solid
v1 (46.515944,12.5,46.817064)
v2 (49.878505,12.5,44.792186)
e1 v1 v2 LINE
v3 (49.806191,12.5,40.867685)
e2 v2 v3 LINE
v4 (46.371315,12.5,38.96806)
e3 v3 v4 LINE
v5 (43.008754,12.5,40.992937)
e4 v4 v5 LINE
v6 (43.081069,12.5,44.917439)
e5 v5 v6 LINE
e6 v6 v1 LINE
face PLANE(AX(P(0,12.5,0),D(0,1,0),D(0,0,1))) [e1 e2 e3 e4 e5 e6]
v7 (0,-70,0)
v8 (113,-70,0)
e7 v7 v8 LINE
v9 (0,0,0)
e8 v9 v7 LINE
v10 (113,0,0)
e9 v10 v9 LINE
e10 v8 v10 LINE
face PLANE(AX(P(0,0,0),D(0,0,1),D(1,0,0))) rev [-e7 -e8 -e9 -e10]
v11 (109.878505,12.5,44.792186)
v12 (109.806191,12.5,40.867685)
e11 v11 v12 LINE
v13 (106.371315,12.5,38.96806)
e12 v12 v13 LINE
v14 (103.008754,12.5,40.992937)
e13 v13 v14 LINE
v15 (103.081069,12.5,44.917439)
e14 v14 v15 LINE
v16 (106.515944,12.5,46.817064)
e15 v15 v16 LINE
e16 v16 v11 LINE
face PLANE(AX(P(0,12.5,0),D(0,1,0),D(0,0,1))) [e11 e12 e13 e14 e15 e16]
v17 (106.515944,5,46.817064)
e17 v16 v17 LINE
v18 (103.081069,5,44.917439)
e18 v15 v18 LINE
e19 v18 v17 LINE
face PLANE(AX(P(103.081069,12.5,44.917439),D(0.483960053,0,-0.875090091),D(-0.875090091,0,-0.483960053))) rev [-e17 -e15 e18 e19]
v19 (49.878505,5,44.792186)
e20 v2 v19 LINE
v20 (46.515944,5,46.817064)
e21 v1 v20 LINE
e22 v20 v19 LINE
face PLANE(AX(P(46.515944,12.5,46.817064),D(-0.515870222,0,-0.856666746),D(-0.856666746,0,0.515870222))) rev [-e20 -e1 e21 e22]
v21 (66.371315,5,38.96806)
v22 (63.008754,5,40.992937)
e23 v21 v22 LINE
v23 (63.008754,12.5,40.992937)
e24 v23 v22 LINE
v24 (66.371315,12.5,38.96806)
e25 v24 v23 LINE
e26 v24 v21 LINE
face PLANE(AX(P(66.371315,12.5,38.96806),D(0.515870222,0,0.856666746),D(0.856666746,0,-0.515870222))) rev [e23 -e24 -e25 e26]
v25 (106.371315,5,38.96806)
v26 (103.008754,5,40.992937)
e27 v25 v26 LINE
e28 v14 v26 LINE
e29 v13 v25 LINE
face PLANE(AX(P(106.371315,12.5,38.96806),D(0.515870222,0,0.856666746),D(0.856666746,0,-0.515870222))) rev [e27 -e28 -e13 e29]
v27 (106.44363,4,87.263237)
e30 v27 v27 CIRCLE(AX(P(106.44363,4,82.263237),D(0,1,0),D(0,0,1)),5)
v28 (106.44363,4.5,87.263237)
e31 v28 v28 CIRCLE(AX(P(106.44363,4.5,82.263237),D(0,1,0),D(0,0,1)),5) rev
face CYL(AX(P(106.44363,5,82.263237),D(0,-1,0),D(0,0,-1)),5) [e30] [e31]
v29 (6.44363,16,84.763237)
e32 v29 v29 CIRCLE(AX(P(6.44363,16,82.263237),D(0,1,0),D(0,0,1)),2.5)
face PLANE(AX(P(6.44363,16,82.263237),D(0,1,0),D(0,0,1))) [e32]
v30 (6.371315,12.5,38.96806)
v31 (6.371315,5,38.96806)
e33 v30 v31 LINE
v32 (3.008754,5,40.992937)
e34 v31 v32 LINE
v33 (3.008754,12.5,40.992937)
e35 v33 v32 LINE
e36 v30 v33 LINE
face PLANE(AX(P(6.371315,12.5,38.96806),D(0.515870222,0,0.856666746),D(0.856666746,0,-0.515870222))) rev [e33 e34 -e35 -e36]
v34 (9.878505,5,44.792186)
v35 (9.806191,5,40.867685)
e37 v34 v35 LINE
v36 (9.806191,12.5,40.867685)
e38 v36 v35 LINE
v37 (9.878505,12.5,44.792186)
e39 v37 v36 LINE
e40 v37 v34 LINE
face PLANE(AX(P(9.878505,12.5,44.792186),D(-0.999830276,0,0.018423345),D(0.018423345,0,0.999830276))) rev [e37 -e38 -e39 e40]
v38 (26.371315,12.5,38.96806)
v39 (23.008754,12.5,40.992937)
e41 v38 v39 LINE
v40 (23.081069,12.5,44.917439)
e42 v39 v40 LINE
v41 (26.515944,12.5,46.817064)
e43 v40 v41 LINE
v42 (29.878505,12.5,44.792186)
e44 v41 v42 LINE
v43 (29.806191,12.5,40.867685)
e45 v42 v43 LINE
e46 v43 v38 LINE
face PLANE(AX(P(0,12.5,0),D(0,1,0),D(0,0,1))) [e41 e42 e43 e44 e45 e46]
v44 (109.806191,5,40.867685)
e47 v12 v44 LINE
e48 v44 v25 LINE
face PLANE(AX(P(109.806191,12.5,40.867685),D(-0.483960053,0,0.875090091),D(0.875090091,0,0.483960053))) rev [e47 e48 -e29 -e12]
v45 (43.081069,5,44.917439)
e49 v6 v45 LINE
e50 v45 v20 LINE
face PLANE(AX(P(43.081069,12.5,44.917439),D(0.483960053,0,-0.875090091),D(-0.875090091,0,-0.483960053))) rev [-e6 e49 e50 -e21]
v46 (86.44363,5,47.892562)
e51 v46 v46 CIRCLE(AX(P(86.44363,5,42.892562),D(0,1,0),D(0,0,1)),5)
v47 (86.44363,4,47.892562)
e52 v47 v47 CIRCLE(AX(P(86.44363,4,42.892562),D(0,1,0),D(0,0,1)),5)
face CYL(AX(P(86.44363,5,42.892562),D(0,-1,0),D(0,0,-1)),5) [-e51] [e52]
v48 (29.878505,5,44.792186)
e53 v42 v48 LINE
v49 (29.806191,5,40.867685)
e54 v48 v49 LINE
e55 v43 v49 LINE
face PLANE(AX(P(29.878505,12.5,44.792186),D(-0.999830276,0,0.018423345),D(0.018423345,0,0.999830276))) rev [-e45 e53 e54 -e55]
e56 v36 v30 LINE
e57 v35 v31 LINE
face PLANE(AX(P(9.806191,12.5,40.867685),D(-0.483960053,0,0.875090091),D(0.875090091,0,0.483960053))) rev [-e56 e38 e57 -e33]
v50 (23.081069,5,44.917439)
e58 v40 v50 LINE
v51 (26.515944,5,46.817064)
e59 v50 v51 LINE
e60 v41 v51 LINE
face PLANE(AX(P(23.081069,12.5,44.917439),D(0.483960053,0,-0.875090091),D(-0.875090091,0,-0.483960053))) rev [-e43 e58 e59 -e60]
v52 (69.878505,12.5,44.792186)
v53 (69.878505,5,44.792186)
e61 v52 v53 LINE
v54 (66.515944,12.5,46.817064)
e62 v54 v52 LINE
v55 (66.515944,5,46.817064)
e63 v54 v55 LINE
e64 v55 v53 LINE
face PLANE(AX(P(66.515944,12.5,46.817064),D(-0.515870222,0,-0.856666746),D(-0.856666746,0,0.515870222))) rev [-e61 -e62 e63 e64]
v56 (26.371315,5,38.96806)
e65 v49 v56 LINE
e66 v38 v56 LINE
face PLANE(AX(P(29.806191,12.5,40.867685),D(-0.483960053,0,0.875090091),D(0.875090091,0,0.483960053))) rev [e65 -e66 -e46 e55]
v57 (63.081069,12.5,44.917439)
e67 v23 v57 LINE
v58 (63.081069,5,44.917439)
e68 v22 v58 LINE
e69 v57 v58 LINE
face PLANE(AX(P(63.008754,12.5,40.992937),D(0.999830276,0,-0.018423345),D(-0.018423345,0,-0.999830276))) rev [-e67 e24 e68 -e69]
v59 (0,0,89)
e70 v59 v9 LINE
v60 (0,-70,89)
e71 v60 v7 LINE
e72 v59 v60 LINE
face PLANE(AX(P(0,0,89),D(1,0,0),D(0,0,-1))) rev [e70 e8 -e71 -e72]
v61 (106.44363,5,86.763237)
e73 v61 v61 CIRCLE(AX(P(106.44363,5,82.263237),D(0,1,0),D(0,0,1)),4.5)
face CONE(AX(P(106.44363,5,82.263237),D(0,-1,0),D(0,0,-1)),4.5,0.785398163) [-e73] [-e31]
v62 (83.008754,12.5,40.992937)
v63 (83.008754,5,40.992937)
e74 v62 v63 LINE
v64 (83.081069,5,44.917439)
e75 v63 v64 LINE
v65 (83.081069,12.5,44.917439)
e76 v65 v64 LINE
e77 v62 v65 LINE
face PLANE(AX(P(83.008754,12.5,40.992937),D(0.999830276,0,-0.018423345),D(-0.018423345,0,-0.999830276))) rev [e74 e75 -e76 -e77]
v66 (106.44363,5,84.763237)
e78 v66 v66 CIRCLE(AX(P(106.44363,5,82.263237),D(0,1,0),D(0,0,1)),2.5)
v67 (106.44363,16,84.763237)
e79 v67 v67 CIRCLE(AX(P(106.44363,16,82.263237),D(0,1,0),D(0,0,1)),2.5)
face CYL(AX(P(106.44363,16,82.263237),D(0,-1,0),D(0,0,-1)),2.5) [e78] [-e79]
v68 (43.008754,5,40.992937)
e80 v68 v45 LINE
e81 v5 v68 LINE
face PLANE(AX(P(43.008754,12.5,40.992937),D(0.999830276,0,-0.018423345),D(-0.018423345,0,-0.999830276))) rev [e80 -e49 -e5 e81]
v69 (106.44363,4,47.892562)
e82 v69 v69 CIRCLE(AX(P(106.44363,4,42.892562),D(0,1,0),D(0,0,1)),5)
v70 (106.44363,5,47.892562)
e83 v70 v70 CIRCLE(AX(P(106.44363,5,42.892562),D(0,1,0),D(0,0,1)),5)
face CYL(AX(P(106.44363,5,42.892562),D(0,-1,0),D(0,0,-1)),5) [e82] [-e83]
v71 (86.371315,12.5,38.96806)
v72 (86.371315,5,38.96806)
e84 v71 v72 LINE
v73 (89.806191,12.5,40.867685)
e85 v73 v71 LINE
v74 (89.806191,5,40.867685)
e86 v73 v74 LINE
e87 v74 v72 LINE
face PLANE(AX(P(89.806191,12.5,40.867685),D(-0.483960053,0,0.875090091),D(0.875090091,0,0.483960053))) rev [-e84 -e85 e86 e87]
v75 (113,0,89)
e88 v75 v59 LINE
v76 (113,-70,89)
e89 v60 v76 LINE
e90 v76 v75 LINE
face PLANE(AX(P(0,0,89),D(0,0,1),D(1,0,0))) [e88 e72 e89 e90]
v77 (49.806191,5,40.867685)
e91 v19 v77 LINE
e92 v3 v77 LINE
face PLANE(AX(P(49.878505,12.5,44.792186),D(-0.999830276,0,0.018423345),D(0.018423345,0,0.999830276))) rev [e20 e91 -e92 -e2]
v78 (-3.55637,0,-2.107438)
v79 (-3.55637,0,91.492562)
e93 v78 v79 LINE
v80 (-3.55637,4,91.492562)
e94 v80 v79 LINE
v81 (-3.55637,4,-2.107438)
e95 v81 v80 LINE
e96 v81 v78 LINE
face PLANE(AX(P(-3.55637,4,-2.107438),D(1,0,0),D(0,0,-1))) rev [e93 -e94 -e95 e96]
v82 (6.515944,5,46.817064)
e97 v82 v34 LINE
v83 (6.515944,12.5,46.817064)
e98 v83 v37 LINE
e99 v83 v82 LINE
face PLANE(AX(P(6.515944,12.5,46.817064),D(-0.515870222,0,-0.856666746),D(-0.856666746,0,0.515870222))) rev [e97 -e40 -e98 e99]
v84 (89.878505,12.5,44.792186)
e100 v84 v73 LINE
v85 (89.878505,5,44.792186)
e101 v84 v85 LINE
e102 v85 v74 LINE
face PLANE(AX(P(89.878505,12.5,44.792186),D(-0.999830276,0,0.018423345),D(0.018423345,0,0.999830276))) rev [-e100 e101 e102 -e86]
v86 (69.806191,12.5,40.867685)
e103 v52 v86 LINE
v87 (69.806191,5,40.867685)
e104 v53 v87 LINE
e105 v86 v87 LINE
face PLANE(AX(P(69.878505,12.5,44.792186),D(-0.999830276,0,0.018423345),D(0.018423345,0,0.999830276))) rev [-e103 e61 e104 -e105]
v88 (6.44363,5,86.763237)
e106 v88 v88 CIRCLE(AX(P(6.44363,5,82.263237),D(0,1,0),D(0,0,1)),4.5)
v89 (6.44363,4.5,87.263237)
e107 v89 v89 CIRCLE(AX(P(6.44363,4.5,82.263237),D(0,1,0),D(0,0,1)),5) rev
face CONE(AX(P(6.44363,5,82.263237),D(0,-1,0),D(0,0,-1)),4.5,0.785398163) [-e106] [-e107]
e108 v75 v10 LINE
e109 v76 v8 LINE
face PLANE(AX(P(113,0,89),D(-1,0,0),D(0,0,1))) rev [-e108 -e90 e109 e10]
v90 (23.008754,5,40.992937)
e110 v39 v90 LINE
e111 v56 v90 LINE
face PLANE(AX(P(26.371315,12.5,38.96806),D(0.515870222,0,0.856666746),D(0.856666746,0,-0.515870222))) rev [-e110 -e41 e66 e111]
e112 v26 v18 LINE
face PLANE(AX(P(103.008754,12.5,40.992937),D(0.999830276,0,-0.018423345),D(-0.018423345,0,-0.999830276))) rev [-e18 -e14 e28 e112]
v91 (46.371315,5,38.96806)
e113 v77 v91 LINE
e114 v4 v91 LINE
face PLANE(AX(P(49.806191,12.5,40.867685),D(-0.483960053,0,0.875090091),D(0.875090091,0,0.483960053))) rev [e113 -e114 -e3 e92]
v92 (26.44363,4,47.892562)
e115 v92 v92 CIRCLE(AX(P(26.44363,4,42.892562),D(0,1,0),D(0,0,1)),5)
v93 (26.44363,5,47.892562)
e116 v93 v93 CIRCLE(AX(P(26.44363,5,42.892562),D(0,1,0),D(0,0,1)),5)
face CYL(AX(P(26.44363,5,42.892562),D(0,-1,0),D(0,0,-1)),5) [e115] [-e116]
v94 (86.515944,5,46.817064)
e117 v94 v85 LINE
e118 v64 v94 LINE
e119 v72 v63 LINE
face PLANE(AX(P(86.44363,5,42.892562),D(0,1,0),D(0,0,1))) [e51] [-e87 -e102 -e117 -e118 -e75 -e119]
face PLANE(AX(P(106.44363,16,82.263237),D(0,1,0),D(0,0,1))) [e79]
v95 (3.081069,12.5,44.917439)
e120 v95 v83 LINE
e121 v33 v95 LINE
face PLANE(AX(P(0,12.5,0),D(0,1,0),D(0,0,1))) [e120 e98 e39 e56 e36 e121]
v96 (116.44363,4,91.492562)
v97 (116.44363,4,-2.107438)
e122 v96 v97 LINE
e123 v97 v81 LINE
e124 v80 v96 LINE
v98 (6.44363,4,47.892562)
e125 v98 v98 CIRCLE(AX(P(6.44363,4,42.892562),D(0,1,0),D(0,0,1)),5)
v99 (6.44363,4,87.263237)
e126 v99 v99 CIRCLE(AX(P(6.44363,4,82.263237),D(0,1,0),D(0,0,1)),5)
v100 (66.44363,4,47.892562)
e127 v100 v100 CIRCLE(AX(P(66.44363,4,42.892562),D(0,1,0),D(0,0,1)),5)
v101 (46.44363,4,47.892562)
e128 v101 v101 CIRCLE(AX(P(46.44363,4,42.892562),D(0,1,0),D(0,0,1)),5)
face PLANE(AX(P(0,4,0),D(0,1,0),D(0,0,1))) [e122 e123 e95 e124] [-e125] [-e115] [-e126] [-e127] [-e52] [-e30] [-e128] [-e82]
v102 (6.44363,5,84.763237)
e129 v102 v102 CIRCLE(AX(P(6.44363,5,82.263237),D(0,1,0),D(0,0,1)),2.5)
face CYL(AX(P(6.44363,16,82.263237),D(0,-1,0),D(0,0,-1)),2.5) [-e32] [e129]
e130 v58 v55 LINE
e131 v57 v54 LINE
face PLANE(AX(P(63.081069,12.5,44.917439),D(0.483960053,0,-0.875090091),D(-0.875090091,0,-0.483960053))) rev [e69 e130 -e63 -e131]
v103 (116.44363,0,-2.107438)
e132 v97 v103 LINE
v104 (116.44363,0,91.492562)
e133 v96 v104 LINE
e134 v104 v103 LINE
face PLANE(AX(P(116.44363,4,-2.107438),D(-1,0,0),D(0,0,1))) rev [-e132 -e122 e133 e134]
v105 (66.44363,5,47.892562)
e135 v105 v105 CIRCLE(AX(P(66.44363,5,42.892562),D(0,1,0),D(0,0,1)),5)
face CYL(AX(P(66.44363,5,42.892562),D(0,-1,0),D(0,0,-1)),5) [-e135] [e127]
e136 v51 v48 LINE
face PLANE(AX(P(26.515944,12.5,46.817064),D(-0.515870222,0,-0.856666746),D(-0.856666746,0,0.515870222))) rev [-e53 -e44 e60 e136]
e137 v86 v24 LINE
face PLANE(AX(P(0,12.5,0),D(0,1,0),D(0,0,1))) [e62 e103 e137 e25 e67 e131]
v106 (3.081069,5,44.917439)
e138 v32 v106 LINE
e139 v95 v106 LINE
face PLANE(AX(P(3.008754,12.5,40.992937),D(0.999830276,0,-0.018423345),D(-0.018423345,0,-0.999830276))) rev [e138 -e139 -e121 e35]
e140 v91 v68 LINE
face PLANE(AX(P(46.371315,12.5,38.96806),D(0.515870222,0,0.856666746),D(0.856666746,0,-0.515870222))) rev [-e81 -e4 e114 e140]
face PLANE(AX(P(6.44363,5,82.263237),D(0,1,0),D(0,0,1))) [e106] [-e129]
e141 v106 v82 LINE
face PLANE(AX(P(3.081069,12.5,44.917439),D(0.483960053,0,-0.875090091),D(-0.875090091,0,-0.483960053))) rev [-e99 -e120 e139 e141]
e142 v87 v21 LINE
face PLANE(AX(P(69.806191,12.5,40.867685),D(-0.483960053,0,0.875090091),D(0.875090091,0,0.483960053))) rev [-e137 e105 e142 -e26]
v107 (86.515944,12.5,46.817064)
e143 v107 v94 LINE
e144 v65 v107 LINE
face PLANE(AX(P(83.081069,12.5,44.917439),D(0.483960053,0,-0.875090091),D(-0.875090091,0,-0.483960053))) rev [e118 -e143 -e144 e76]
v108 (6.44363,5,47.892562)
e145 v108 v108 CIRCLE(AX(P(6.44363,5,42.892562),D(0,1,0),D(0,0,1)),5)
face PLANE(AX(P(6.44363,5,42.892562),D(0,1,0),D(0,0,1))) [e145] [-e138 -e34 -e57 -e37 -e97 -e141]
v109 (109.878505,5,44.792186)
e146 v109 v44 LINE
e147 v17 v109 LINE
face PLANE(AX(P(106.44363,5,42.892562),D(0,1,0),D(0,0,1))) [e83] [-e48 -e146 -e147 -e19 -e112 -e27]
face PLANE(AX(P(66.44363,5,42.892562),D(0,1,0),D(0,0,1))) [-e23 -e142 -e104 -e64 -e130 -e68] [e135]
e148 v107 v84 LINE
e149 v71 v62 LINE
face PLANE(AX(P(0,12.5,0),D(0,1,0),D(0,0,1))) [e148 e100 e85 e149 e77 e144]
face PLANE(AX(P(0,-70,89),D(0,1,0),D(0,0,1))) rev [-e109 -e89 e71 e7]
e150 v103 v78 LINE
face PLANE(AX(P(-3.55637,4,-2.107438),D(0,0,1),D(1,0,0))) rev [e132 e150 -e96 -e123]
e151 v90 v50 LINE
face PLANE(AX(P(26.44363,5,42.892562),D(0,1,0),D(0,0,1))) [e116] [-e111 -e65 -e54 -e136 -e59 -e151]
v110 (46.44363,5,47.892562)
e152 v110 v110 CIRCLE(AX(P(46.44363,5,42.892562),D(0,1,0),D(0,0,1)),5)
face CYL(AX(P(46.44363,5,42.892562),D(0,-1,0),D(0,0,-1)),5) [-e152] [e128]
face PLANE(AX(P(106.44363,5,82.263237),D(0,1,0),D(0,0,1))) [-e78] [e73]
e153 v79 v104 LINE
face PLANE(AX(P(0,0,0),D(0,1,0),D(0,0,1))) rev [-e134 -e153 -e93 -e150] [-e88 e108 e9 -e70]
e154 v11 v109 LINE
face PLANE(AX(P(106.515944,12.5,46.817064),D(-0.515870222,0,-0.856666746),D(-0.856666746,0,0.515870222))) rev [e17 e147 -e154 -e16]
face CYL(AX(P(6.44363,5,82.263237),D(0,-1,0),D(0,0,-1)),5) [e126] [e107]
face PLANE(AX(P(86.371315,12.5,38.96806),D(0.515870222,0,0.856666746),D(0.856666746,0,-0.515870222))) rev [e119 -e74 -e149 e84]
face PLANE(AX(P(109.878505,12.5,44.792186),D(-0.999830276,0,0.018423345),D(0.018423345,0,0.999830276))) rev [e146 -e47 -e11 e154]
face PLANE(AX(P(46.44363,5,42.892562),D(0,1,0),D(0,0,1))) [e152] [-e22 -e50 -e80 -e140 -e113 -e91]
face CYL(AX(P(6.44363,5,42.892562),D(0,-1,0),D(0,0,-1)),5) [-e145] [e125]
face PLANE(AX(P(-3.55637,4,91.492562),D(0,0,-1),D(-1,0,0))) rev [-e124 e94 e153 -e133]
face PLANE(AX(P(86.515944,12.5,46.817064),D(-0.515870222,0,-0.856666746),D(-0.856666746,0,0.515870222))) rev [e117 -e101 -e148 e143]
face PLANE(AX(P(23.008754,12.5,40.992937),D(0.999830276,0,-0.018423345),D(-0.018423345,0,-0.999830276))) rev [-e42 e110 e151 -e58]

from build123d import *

# Parameters (mm, degrees)
SKETCH2_W           = 113
SKETCH2_H           = 70
BOSS_EXTRUDE2_DEPTH = 89
SKETCH3_W           = 120
SKETCH3_H           = 93.6
BOSS_EXTRUDE3_DEPTH = 4
SKETCH5_R           = 5
BOSS_EXTRUDE4_DEPTH = 1
BOSS_EXTRUDE5_DEPTH = 7.5
SKETCH9_R           = 5
BOSS_EXTRUDE6_DEPTH = 1
SKETCH11_R          = 2.5
BOSS_EXTRUDE7_DEPTH = 11


with BuildPart() as part:
    # Sketch2 → Boss-Extrude2 (new body)
    with BuildSketch(Plane.XY):
        with Locations((56.5, -35)):
            Rectangle(SKETCH2_W, SKETCH2_H)
    extrude(amount=BOSS_EXTRUDE2_DEPTH)

    # Sketch3 → Boss-Extrude3 (add)
    with BuildSketch(Plane(origin=(0, 0, 0), x_dir=(1, 0, 0), z_dir=(0, 1, 0))):
        with Locations((56.443629761, -44.692561868)):
            Rectangle(SKETCH3_W, SKETCH3_H)
    extrude(amount=BOSS_EXTRUDE3_DEPTH)

    # Sketch5 → Boss-Extrude4 (add)
    with BuildSketch(Plane(origin=(0, 4, 0), x_dir=(1, 0, 0), z_dir=(0, 1, 0))):
        with Locations(Location((6.443629761, -42.892561868, 0), (0, 0, 270))):
            Circle(SKETCH5_R)
        with Locations(Location((26.443629761, -42.892561868, 0), (0, 0, 270))):
            Circle(SKETCH5_R)
        with Locations(Location((46.443629761, -42.892561868, 0), (0, 0, 270))):
            Circle(SKETCH5_R)
        with Locations(Location((66.443629761, -42.892561868, 0), (0, 0, 270))):
            Circle(SKETCH5_R)
        with Locations(Location((86.443629761, -42.892561868, 0), (0, 0, 270))):
            Circle(SKETCH5_R)
        with Locations(Location((106.443629761, -42.892561868, 0), (0, 0, 270))):
            Circle(SKETCH5_R)
    extrude(amount=BOSS_EXTRUDE4_DEPTH)

    # Sketch7 → Boss-Extrude5 (add)
    with BuildSketch(Plane(origin=(0, 5, 0), x_dir=(1, 0, 0), z_dir=(0, 1, 0))):
        Polygon((29.878505301, -44.792186338), (29.80619058, -40.867684626), (26.37131504, -38.968060156), (23.008754221, -40.992937397), (23.081068941, -44.917439109), (26.515944482, -46.81706358), align=None)
        Polygon((9.878505301, -44.792186338), (9.80619058, -40.867684626), (6.37131504, -38.968060156), (3.008754221, -40.992937397), (3.081068941, -44.917439109), (6.515944482, -46.81706358), align=None)
        Polygon((49.878505301, -44.792186338), (49.80619058, -40.867684626), (46.37131504, -38.968060156), (43.008754221, -40.992937397), (43.081068941, -44.917439109), (46.515944482, -46.81706358), align=None)
        Polygon((69.878505301, -44.792186338), (69.80619058, -40.867684626), (66.37131504, -38.968060156), (63.008754221, -40.992937397), (63.081068941, -44.917439109), (66.515944482, -46.81706358), align=None)
        Polygon((89.878505301, -44.792186338), (89.80619058, -40.867684626), (86.37131504, -38.968060156), (83.008754221, -40.992937397), (83.081068941, -44.917439109), (86.515944482, -46.81706358), align=None)
        Polygon((109.878505301, -44.792186338), (109.80619058, -40.867684626), (106.37131504, -38.968060156), (103.008754221, -40.992937397), (103.081068941, -44.917439109), (106.515944482, -46.81706358), align=None)
    extrude(amount=BOSS_EXTRUDE5_DEPTH)

    # Sketch9 → Boss-Extrude6 (add)
    with BuildSketch(Plane(origin=(0, 4, 0), x_dir=(1, 0, 0), z_dir=(0, 1, 0))):
        with Locations(Location((6.443629761, -82.263237169, 0), (0, 0, 270))):
            Circle(SKETCH9_R)
        with Locations(Location((106.443629761, -82.263237169, 0), (0, 0, 270))):
            Circle(SKETCH9_R)
    extrude(amount=BOSS_EXTRUDE6_DEPTH)

    # Fillet5: read off the stored shape, not the designer's step
    # Fillet5 outline → Fillet5 (revolve, cut)
    with BuildSketch(Plane(origin=(6.443629761, 0, 82.263237169), x_dir=(1, 0, 0), z_dir=(0, 0, 1))):
        Polygon((5, 5), (4.5, 5), (5, 4.5), align=None)
    revolve(axis=Axis((6.443629761, 0, 82.263237169), (0, 1, 0)), mode=Mode.SUBTRACT)

    # Fillet7: read off the stored shape, not the designer's step
    # Fillet7 outline → Fillet7 (revolve, cut)
    with BuildSketch(Plane(origin=(106.443629761, 0, 82.263237169), x_dir=(1, 0, 0), z_dir=(0, 0, 1))):
        Polygon((5, 5), (4.5, 5), (5, 4.5), align=None)
    revolve(axis=Axis((106.443629761, 0, 82.263237169), (0, 1, 0)), mode=Mode.SUBTRACT)

    # Sketch11 → Boss-Extrude7 (add)
    with BuildSketch(Plane(origin=(0, 5, 0), x_dir=(1, 0, 0), z_dir=(0, 1, 0))):
        with Locations(Location((6.443629761, -82.263237169, 0), (0, 0, 270))):
            Circle(SKETCH11_R)
        with Locations(Location((106.443629761, -82.263237169, 0), (0, 0, 270))):
            Circle(SKETCH11_R)
    extrude(amount=BOSS_EXTRUDE7_DEPTH)


solid = part.part
